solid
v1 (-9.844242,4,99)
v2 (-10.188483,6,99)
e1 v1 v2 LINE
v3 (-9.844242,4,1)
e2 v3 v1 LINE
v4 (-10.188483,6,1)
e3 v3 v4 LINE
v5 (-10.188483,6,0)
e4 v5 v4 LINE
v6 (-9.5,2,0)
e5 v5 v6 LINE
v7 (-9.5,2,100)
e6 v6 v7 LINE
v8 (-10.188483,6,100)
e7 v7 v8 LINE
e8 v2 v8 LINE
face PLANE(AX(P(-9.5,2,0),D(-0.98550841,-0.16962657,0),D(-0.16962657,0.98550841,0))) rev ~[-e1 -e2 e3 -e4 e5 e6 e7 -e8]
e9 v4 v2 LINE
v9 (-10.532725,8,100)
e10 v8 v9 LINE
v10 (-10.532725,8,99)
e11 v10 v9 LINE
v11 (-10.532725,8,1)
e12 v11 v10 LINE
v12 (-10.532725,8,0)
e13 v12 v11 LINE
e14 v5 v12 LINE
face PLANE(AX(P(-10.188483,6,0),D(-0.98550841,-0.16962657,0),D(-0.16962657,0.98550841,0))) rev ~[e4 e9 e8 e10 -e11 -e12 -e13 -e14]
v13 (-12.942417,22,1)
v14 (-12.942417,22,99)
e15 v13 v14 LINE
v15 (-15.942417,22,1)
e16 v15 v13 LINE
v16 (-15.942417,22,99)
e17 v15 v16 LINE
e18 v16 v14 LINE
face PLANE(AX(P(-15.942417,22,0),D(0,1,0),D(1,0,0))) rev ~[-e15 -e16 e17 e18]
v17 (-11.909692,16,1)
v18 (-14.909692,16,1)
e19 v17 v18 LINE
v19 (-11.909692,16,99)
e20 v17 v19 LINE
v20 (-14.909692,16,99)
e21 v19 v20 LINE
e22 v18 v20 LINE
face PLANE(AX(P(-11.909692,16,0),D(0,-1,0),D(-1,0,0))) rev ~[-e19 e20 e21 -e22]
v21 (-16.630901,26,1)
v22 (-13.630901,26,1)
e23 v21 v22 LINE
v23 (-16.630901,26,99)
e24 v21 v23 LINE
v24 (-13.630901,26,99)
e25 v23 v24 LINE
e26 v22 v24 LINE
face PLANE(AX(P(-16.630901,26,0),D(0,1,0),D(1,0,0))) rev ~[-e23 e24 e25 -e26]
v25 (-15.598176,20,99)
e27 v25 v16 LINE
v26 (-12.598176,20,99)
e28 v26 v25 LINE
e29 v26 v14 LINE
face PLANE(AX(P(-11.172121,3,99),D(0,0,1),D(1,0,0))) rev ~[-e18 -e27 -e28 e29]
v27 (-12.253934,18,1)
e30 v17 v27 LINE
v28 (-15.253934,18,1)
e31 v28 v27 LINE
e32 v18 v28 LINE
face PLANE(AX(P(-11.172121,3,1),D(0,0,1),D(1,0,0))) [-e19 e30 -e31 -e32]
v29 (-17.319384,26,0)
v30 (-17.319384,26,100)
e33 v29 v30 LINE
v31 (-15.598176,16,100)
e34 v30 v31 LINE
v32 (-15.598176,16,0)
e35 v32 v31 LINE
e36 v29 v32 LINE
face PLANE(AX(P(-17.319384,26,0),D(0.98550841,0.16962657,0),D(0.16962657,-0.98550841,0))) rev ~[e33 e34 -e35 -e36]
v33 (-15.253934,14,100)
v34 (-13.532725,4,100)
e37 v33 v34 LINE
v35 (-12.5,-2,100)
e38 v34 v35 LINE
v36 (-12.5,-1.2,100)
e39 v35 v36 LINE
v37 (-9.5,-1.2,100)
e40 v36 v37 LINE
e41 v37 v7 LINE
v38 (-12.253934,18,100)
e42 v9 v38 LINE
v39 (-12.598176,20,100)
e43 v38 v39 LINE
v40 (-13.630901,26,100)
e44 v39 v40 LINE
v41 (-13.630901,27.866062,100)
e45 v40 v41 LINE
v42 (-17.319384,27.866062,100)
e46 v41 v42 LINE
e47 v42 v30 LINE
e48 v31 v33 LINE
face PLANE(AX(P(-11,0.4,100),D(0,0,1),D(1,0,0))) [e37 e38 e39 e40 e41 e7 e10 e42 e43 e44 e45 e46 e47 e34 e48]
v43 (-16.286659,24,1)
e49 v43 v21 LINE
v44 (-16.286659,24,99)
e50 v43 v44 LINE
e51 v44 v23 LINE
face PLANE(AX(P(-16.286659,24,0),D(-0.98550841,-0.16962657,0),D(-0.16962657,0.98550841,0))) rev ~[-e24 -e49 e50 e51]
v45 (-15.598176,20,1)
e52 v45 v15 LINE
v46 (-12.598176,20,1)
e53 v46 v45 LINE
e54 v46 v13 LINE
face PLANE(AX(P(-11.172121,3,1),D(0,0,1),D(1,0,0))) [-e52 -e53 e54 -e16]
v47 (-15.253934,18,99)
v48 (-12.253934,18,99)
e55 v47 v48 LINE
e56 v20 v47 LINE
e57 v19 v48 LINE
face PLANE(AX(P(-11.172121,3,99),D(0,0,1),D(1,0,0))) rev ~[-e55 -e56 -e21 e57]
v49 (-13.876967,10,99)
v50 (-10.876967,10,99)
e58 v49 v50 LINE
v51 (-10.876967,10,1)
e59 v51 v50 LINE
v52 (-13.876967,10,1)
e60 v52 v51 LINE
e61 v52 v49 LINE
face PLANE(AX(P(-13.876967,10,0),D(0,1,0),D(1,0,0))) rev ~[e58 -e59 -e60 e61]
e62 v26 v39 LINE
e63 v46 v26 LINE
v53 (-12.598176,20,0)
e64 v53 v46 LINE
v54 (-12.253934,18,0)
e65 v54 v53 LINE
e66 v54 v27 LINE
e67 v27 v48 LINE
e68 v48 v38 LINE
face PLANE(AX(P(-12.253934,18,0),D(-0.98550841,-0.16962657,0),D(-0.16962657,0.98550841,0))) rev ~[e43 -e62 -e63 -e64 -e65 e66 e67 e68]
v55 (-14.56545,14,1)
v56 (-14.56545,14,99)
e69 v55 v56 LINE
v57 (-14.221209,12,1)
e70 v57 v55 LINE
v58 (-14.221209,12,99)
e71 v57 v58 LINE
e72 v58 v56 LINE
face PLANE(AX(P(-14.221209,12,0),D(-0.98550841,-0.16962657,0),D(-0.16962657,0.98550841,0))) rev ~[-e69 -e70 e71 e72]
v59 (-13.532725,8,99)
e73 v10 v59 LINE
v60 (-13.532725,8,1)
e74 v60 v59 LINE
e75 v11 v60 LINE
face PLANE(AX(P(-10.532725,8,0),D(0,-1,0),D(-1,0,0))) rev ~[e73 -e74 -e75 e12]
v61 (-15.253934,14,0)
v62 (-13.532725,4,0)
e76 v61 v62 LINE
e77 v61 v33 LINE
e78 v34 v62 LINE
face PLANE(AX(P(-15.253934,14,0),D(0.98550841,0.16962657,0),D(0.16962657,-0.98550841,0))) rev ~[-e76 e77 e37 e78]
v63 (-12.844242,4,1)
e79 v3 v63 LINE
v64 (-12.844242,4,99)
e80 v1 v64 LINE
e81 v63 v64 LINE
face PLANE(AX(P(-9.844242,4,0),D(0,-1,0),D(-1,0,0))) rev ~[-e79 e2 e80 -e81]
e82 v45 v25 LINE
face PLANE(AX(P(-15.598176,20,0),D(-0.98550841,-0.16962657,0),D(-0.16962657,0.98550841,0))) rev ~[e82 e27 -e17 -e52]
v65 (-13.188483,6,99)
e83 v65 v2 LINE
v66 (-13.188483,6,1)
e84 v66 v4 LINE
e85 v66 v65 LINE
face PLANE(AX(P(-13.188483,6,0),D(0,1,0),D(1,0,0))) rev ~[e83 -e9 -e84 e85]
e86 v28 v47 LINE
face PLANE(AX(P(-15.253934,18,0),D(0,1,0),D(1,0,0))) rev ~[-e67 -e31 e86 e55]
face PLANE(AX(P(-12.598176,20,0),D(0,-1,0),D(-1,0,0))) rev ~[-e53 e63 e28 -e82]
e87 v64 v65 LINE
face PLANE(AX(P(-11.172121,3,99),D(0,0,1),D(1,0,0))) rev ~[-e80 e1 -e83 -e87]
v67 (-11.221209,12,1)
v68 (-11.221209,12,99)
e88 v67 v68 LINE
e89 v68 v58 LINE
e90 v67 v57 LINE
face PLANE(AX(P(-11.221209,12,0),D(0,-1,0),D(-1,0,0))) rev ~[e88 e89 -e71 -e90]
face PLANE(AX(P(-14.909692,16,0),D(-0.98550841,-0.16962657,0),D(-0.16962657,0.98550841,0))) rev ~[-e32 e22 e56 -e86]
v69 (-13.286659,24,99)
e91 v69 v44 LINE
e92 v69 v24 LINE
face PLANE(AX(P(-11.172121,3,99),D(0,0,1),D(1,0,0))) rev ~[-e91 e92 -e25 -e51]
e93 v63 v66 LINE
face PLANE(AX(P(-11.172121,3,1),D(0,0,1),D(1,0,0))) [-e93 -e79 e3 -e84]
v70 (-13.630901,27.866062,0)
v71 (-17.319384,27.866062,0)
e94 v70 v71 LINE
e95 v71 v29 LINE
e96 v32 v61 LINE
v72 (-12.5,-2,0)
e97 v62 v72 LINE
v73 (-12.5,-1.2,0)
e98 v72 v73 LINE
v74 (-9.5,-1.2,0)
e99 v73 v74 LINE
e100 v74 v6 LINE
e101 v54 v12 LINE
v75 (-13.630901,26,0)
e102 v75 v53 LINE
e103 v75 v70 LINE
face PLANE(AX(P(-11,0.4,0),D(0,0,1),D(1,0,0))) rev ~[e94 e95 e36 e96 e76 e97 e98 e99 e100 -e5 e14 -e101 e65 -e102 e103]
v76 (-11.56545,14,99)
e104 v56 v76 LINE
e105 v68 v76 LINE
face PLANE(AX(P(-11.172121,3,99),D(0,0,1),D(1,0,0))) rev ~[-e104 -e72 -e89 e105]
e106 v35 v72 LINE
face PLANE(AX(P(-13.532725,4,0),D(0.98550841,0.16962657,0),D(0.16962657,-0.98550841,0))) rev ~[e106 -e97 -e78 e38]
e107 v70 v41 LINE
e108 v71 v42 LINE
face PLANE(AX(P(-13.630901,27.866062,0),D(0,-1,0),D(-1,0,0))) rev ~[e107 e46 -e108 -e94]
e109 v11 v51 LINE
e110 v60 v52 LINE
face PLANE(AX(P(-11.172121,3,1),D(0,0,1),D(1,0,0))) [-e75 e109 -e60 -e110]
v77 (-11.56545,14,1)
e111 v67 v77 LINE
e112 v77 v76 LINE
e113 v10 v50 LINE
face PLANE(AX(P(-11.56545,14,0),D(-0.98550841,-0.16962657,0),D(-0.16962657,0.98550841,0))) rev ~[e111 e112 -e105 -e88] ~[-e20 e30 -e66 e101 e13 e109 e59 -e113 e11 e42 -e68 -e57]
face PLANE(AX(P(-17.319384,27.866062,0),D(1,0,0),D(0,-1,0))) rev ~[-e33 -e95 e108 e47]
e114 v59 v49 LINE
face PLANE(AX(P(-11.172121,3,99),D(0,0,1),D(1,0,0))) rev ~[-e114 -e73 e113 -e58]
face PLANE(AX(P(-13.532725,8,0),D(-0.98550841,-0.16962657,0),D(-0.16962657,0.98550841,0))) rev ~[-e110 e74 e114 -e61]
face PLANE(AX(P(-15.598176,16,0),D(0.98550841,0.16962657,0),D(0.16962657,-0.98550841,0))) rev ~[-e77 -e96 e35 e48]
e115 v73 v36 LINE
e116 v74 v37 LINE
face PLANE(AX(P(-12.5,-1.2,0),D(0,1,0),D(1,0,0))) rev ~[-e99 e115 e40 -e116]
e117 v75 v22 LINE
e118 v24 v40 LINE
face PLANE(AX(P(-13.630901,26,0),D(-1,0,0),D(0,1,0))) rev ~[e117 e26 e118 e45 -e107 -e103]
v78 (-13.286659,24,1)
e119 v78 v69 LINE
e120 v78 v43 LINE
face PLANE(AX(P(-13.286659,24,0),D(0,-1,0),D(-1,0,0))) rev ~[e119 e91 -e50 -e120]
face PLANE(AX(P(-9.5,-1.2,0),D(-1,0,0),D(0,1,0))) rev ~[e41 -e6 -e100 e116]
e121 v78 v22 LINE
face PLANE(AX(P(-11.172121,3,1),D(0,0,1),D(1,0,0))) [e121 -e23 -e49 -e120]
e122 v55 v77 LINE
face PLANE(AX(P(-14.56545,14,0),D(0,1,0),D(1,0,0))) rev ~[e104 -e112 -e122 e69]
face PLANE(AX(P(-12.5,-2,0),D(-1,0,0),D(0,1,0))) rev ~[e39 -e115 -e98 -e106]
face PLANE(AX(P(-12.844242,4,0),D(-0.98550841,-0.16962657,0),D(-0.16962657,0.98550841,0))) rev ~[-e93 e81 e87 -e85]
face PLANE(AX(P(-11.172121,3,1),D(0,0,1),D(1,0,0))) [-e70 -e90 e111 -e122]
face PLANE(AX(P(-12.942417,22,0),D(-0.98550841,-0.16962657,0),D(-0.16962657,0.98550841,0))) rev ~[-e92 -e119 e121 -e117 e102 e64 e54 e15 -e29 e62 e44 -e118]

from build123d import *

# Parameters (mm, degrees)
F1_DEPTH = 100
F2_DEPTH = 1
F3_START = 99
F3_DEPTH = 1


with BuildPart() as f1:
    # F0 (on Top) → F1 (new body)
    with BuildSketch(Plane.XY):
        Polygon((-10.3999599814, 2), (-12.5, 2), (-12.5, -1.2), (-9.5, -1.2), (-9.5, 1.1444095289), (-9.5, 2), align=None)
        Polygon((-12.5, -1.2), (-12.5, 2), (-12.8442417498, 4), (-13.5327252493, 4), (-12.5, -2), align=None)
        Polygon((-12.8442417498, 4), (-12.5, 2), (-10.3999599814, 2), (-9.5, 2), (-9.8442417498, 4), align=None)
        Polygon((-13.5327252493, 4), (-12.8442417498, 4), (-13.1884834996, 6), (-13.8769669991, 6), align=None)
        Polygon((-13.5327252493, 8), (-13.1884834996, 6), (-10.1884834996, 6), (-10.5327252493, 8), align=None)
        Polygon((-13.8769669991, 6), (-13.1884834996, 6), (-13.5327252493, 8), (-14.2212087489, 8), align=None)
        Polygon((-14.2212087489, 8), (-13.5327252493, 8), (-13.8769669991, 10), (-14.5654504987, 10), align=None)
        Polygon((-14.2212087489, 12), (-13.8769669991, 10), (-10.8769669991, 10), (-11.2212087489, 12), align=None)
        Polygon((-14.9096922485, 16), (-14.5654504987, 14), (-11.5654504987, 14), (-11.9096922485, 16), align=None)
        Polygon((-15.598175748, 20), (-15.2539339983, 18), (-12.2539339983, 18), (-12.598175748, 20), align=None)
        Polygon((-14.5654504987, 10), (-13.8769669991, 10), (-14.2212087489, 12), (-14.9096922485, 12), align=None)
        Polygon((-14.9096922485, 12), (-14.2212087489, 12), (-14.5654504987, 14), (-15.2539339983, 14), align=None)
        Polygon((-15.2539339983, 14), (-14.5654504987, 14), (-14.9096922485, 16), (-15.598175748, 16), align=None)
        Polygon((-15.598175748, 16), (-14.9096922485, 16), (-15.2539339983, 18), (-15.9424174978, 18), align=None)
        Polygon((-15.9424174978, 18), (-15.2539339983, 18), (-15.598175748, 20), (-16.2866592476, 20), align=None)
        Polygon((-16.2866592476, 20), (-15.598175748, 20), (-15.9424174978, 22), (-16.6309009974, 22), align=None)
        Polygon((-16.6309009974, 22), (-15.9424174978, 22), (-16.2866592476, 24), (-16.9751427472, 24), align=None)
        Polygon((-16.9751427472, 24), (-16.2866592476, 24), (-16.6309009974, 26), (-17.319384497, 26), align=None)
        Polygon((-17.319384497, 26), (-16.6309009974, 26), (-13.6309009974, 26), (-13.6309009974, 27.8660617122), (-17.319384497, 27.8660617122), align=None)
        Polygon((-16.2866592476, 24), (-15.9424174978, 22), (-12.9424174978, 22), (-13.2866592476, 24), align=None)
    extrude(amount=F1_DEPTH)

    # F0 (on Top) → F2 (join)
    with BuildSketch(Plane.XY):
        Polygon((-12.8442417498, 4), (-12.5, 2), (-10.3999599814, 2), (-9.5, 2), (-9.8442417498, 4), align=None)
        Polygon((-12.5, -1.2), (-12.5, 2), (-12.8442417498, 4), (-13.5327252493, 4), (-12.5, -2), align=None)
        Polygon((-13.1884834996, 6), (-12.8442417498, 4), (-9.8442417498, 4), (-10.1884834996, 6), align=None)
        Polygon((-13.5327252493, 4), (-12.8442417498, 4), (-13.1884834996, 6), (-13.8769669991, 6), align=None)
        Polygon((-13.5327252493, 8), (-13.1884834996, 6), (-10.1884834996, 6), (-10.5327252493, 8), align=None)
        Polygon((-13.8769669991, 6), (-13.1884834996, 6), (-13.5327252493, 8), (-14.2212087489, 8), align=None)
        Polygon((-13.8769669991, 10), (-13.5327252493, 8), (-10.5327252493, 8), (-10.8769669991, 10), align=None)
        Polygon((-14.2212087489, 8), (-13.5327252493, 8), (-13.8769669991, 10), (-14.5654504987, 10), align=None)
        Polygon((-14.2212087489, 12), (-13.8769669991, 10), (-10.8769669991, 10), (-11.2212087489, 12), align=None)
        Polygon((-14.5654504987, 10), (-13.8769669991, 10), (-14.2212087489, 12), (-14.9096922485, 12), align=None)
        Polygon((-14.5654504987, 14), (-14.2212087489, 12), (-11.2212087489, 12), (-11.5654504987, 14), align=None)
        Polygon((-14.9096922485, 12), (-14.2212087489, 12), (-14.5654504987, 14), (-15.2539339983, 14), align=None)
        Polygon((-14.9096922485, 16), (-14.5654504987, 14), (-11.5654504987, 14), (-11.9096922485, 16), align=None)
        Polygon((-15.2539339983, 14), (-14.5654504987, 14), (-14.9096922485, 16), (-15.598175748, 16), align=None)
        Polygon((-15.2539339983, 18), (-14.9096922485, 16), (-11.9096922485, 16), (-12.2539339983, 18), align=None)
        Polygon((-15.598175748, 16), (-14.9096922485, 16), (-15.2539339983, 18), (-15.9424174978, 18), align=None)
        Polygon((-15.598175748, 20), (-15.2539339983, 18), (-12.2539339983, 18), (-12.598175748, 20), align=None)
        Polygon((-15.9424174978, 18), (-15.2539339983, 18), (-15.598175748, 20), (-16.2866592476, 20), align=None)
        Polygon((-15.9424174978, 22), (-15.598175748, 20), (-12.598175748, 20), (-12.9424174978, 22), align=None)
        Polygon((-16.2866592476, 20), (-15.598175748, 20), (-15.9424174978, 22), (-16.6309009974, 22), align=None)
        Polygon((-16.2866592476, 24), (-15.9424174978, 22), (-12.9424174978, 22), (-13.2866592476, 24), align=None)
        Polygon((-16.6309009974, 22), (-15.9424174978, 22), (-16.2866592476, 24), (-16.9751427472, 24), align=None)
        Polygon((-16.6309009974, 26), (-16.2866592476, 24), (-13.2866592476, 24), (-13.6309009974, 26), align=None)
        Polygon((-16.9751427472, 24), (-16.2866592476, 24), (-16.6309009974, 26), (-17.319384497, 26), align=None)
        Polygon((-17.319384497, 26), (-16.6309009974, 26), (-13.6309009974, 26), (-13.6309009974, 27.8660617122), (-17.319384497, 27.8660617122), align=None)
    extrude(amount=F2_DEPTH)

    # F0 (on Top) → F3 (join)
    with BuildSketch(Plane.XY.offset(F3_START)):
        Polygon((-12.8442417498, 4), (-12.5, 2), (-10.3999599814, 2), (-9.5, 2), (-9.8442417498, 4), align=None)
        Polygon((-10.3999599814, 2), (-12.5, 2), (-12.5, -1.2), (-9.5, -1.2), (-9.5, 1.1444095289), (-9.5, 2), align=None)
        Polygon((-12.5, -1.2), (-12.5, 2), (-12.8442417498, 4), (-13.5327252493, 4), (-12.5, -2), align=None)
        Polygon((-13.1884834996, 6), (-12.8442417498, 4), (-9.8442417498, 4), (-10.1884834996, 6), align=None)
        Polygon((-13.5327252493, 4), (-12.8442417498, 4), (-13.1884834996, 6), (-13.8769669991, 6), align=None)
        Polygon((-13.5327252493, 8), (-13.1884834996, 6), (-10.1884834996, 6), (-10.5327252493, 8), align=None)
        Polygon((-13.8769669991, 6), (-13.1884834996, 6), (-13.5327252493, 8), (-14.2212087489, 8), align=None)
        Polygon((-13.8769669991, 10), (-13.5327252493, 8), (-10.5327252493, 8), (-10.8769669991, 10), align=None)
        Polygon((-14.2212087489, 8), (-13.5327252493, 8), (-13.8769669991, 10), (-14.5654504987, 10), align=None)
        Polygon((-14.2212087489, 12), (-13.8769669991, 10), (-10.8769669991, 10), (-11.2212087489, 12), align=None)
        Polygon((-14.5654504987, 10), (-13.8769669991, 10), (-14.2212087489, 12), (-14.9096922485, 12), align=None)
        Polygon((-14.5654504987, 14), (-14.2212087489, 12), (-11.2212087489, 12), (-11.5654504987, 14), align=None)
        Polygon((-14.9096922485, 12), (-14.2212087489, 12), (-14.5654504987, 14), (-15.2539339983, 14), align=None)
        Polygon((-14.9096922485, 16), (-14.5654504987, 14), (-11.5654504987, 14), (-11.9096922485, 16), align=None)
        Polygon((-15.2539339983, 14), (-14.5654504987, 14), (-14.9096922485, 16), (-15.598175748, 16), align=None)
        Polygon((-15.2539339983, 18), (-14.9096922485, 16), (-11.9096922485, 16), (-12.2539339983, 18), align=None)
        Polygon((-15.598175748, 16), (-14.9096922485, 16), (-15.2539339983, 18), (-15.9424174978, 18), align=None)
        Polygon((-15.598175748, 20), (-15.2539339983, 18), (-12.2539339983, 18), (-12.598175748, 20), align=None)
        Polygon((-15.9424174978, 18), (-15.2539339983, 18), (-15.598175748, 20), (-16.2866592476, 20), align=None)
        Polygon((-15.9424174978, 22), (-15.598175748, 20), (-12.598175748, 20), (-12.9424174978, 22), align=None)
        Polygon((-16.2866592476, 20), (-15.598175748, 20), (-15.9424174978, 22), (-16.6309009974, 22), align=None)
        Polygon((-16.2866592476, 24), (-15.9424174978, 22), (-12.9424174978, 22), (-13.2866592476, 24), align=None)
        Polygon((-16.6309009974, 22), (-15.9424174978, 22), (-16.2866592476, 24), (-16.9751427472, 24), align=None)
        Polygon((-16.6309009974, 26), (-16.2866592476, 24), (-13.2866592476, 24), (-13.6309009974, 26), align=None)
        Polygon((-16.9751427472, 24), (-16.2866592476, 24), (-16.6309009974, 26), (-17.319384497, 26), align=None)
        Polygon((-17.319384497, 26), (-16.6309009974, 26), (-13.6309009974, 26), (-13.6309009974, 27.8660617122), (-17.319384497, 27.8660617122), align=None)
    extrude(amount=F3_DEPTH)


solid = f1.part
